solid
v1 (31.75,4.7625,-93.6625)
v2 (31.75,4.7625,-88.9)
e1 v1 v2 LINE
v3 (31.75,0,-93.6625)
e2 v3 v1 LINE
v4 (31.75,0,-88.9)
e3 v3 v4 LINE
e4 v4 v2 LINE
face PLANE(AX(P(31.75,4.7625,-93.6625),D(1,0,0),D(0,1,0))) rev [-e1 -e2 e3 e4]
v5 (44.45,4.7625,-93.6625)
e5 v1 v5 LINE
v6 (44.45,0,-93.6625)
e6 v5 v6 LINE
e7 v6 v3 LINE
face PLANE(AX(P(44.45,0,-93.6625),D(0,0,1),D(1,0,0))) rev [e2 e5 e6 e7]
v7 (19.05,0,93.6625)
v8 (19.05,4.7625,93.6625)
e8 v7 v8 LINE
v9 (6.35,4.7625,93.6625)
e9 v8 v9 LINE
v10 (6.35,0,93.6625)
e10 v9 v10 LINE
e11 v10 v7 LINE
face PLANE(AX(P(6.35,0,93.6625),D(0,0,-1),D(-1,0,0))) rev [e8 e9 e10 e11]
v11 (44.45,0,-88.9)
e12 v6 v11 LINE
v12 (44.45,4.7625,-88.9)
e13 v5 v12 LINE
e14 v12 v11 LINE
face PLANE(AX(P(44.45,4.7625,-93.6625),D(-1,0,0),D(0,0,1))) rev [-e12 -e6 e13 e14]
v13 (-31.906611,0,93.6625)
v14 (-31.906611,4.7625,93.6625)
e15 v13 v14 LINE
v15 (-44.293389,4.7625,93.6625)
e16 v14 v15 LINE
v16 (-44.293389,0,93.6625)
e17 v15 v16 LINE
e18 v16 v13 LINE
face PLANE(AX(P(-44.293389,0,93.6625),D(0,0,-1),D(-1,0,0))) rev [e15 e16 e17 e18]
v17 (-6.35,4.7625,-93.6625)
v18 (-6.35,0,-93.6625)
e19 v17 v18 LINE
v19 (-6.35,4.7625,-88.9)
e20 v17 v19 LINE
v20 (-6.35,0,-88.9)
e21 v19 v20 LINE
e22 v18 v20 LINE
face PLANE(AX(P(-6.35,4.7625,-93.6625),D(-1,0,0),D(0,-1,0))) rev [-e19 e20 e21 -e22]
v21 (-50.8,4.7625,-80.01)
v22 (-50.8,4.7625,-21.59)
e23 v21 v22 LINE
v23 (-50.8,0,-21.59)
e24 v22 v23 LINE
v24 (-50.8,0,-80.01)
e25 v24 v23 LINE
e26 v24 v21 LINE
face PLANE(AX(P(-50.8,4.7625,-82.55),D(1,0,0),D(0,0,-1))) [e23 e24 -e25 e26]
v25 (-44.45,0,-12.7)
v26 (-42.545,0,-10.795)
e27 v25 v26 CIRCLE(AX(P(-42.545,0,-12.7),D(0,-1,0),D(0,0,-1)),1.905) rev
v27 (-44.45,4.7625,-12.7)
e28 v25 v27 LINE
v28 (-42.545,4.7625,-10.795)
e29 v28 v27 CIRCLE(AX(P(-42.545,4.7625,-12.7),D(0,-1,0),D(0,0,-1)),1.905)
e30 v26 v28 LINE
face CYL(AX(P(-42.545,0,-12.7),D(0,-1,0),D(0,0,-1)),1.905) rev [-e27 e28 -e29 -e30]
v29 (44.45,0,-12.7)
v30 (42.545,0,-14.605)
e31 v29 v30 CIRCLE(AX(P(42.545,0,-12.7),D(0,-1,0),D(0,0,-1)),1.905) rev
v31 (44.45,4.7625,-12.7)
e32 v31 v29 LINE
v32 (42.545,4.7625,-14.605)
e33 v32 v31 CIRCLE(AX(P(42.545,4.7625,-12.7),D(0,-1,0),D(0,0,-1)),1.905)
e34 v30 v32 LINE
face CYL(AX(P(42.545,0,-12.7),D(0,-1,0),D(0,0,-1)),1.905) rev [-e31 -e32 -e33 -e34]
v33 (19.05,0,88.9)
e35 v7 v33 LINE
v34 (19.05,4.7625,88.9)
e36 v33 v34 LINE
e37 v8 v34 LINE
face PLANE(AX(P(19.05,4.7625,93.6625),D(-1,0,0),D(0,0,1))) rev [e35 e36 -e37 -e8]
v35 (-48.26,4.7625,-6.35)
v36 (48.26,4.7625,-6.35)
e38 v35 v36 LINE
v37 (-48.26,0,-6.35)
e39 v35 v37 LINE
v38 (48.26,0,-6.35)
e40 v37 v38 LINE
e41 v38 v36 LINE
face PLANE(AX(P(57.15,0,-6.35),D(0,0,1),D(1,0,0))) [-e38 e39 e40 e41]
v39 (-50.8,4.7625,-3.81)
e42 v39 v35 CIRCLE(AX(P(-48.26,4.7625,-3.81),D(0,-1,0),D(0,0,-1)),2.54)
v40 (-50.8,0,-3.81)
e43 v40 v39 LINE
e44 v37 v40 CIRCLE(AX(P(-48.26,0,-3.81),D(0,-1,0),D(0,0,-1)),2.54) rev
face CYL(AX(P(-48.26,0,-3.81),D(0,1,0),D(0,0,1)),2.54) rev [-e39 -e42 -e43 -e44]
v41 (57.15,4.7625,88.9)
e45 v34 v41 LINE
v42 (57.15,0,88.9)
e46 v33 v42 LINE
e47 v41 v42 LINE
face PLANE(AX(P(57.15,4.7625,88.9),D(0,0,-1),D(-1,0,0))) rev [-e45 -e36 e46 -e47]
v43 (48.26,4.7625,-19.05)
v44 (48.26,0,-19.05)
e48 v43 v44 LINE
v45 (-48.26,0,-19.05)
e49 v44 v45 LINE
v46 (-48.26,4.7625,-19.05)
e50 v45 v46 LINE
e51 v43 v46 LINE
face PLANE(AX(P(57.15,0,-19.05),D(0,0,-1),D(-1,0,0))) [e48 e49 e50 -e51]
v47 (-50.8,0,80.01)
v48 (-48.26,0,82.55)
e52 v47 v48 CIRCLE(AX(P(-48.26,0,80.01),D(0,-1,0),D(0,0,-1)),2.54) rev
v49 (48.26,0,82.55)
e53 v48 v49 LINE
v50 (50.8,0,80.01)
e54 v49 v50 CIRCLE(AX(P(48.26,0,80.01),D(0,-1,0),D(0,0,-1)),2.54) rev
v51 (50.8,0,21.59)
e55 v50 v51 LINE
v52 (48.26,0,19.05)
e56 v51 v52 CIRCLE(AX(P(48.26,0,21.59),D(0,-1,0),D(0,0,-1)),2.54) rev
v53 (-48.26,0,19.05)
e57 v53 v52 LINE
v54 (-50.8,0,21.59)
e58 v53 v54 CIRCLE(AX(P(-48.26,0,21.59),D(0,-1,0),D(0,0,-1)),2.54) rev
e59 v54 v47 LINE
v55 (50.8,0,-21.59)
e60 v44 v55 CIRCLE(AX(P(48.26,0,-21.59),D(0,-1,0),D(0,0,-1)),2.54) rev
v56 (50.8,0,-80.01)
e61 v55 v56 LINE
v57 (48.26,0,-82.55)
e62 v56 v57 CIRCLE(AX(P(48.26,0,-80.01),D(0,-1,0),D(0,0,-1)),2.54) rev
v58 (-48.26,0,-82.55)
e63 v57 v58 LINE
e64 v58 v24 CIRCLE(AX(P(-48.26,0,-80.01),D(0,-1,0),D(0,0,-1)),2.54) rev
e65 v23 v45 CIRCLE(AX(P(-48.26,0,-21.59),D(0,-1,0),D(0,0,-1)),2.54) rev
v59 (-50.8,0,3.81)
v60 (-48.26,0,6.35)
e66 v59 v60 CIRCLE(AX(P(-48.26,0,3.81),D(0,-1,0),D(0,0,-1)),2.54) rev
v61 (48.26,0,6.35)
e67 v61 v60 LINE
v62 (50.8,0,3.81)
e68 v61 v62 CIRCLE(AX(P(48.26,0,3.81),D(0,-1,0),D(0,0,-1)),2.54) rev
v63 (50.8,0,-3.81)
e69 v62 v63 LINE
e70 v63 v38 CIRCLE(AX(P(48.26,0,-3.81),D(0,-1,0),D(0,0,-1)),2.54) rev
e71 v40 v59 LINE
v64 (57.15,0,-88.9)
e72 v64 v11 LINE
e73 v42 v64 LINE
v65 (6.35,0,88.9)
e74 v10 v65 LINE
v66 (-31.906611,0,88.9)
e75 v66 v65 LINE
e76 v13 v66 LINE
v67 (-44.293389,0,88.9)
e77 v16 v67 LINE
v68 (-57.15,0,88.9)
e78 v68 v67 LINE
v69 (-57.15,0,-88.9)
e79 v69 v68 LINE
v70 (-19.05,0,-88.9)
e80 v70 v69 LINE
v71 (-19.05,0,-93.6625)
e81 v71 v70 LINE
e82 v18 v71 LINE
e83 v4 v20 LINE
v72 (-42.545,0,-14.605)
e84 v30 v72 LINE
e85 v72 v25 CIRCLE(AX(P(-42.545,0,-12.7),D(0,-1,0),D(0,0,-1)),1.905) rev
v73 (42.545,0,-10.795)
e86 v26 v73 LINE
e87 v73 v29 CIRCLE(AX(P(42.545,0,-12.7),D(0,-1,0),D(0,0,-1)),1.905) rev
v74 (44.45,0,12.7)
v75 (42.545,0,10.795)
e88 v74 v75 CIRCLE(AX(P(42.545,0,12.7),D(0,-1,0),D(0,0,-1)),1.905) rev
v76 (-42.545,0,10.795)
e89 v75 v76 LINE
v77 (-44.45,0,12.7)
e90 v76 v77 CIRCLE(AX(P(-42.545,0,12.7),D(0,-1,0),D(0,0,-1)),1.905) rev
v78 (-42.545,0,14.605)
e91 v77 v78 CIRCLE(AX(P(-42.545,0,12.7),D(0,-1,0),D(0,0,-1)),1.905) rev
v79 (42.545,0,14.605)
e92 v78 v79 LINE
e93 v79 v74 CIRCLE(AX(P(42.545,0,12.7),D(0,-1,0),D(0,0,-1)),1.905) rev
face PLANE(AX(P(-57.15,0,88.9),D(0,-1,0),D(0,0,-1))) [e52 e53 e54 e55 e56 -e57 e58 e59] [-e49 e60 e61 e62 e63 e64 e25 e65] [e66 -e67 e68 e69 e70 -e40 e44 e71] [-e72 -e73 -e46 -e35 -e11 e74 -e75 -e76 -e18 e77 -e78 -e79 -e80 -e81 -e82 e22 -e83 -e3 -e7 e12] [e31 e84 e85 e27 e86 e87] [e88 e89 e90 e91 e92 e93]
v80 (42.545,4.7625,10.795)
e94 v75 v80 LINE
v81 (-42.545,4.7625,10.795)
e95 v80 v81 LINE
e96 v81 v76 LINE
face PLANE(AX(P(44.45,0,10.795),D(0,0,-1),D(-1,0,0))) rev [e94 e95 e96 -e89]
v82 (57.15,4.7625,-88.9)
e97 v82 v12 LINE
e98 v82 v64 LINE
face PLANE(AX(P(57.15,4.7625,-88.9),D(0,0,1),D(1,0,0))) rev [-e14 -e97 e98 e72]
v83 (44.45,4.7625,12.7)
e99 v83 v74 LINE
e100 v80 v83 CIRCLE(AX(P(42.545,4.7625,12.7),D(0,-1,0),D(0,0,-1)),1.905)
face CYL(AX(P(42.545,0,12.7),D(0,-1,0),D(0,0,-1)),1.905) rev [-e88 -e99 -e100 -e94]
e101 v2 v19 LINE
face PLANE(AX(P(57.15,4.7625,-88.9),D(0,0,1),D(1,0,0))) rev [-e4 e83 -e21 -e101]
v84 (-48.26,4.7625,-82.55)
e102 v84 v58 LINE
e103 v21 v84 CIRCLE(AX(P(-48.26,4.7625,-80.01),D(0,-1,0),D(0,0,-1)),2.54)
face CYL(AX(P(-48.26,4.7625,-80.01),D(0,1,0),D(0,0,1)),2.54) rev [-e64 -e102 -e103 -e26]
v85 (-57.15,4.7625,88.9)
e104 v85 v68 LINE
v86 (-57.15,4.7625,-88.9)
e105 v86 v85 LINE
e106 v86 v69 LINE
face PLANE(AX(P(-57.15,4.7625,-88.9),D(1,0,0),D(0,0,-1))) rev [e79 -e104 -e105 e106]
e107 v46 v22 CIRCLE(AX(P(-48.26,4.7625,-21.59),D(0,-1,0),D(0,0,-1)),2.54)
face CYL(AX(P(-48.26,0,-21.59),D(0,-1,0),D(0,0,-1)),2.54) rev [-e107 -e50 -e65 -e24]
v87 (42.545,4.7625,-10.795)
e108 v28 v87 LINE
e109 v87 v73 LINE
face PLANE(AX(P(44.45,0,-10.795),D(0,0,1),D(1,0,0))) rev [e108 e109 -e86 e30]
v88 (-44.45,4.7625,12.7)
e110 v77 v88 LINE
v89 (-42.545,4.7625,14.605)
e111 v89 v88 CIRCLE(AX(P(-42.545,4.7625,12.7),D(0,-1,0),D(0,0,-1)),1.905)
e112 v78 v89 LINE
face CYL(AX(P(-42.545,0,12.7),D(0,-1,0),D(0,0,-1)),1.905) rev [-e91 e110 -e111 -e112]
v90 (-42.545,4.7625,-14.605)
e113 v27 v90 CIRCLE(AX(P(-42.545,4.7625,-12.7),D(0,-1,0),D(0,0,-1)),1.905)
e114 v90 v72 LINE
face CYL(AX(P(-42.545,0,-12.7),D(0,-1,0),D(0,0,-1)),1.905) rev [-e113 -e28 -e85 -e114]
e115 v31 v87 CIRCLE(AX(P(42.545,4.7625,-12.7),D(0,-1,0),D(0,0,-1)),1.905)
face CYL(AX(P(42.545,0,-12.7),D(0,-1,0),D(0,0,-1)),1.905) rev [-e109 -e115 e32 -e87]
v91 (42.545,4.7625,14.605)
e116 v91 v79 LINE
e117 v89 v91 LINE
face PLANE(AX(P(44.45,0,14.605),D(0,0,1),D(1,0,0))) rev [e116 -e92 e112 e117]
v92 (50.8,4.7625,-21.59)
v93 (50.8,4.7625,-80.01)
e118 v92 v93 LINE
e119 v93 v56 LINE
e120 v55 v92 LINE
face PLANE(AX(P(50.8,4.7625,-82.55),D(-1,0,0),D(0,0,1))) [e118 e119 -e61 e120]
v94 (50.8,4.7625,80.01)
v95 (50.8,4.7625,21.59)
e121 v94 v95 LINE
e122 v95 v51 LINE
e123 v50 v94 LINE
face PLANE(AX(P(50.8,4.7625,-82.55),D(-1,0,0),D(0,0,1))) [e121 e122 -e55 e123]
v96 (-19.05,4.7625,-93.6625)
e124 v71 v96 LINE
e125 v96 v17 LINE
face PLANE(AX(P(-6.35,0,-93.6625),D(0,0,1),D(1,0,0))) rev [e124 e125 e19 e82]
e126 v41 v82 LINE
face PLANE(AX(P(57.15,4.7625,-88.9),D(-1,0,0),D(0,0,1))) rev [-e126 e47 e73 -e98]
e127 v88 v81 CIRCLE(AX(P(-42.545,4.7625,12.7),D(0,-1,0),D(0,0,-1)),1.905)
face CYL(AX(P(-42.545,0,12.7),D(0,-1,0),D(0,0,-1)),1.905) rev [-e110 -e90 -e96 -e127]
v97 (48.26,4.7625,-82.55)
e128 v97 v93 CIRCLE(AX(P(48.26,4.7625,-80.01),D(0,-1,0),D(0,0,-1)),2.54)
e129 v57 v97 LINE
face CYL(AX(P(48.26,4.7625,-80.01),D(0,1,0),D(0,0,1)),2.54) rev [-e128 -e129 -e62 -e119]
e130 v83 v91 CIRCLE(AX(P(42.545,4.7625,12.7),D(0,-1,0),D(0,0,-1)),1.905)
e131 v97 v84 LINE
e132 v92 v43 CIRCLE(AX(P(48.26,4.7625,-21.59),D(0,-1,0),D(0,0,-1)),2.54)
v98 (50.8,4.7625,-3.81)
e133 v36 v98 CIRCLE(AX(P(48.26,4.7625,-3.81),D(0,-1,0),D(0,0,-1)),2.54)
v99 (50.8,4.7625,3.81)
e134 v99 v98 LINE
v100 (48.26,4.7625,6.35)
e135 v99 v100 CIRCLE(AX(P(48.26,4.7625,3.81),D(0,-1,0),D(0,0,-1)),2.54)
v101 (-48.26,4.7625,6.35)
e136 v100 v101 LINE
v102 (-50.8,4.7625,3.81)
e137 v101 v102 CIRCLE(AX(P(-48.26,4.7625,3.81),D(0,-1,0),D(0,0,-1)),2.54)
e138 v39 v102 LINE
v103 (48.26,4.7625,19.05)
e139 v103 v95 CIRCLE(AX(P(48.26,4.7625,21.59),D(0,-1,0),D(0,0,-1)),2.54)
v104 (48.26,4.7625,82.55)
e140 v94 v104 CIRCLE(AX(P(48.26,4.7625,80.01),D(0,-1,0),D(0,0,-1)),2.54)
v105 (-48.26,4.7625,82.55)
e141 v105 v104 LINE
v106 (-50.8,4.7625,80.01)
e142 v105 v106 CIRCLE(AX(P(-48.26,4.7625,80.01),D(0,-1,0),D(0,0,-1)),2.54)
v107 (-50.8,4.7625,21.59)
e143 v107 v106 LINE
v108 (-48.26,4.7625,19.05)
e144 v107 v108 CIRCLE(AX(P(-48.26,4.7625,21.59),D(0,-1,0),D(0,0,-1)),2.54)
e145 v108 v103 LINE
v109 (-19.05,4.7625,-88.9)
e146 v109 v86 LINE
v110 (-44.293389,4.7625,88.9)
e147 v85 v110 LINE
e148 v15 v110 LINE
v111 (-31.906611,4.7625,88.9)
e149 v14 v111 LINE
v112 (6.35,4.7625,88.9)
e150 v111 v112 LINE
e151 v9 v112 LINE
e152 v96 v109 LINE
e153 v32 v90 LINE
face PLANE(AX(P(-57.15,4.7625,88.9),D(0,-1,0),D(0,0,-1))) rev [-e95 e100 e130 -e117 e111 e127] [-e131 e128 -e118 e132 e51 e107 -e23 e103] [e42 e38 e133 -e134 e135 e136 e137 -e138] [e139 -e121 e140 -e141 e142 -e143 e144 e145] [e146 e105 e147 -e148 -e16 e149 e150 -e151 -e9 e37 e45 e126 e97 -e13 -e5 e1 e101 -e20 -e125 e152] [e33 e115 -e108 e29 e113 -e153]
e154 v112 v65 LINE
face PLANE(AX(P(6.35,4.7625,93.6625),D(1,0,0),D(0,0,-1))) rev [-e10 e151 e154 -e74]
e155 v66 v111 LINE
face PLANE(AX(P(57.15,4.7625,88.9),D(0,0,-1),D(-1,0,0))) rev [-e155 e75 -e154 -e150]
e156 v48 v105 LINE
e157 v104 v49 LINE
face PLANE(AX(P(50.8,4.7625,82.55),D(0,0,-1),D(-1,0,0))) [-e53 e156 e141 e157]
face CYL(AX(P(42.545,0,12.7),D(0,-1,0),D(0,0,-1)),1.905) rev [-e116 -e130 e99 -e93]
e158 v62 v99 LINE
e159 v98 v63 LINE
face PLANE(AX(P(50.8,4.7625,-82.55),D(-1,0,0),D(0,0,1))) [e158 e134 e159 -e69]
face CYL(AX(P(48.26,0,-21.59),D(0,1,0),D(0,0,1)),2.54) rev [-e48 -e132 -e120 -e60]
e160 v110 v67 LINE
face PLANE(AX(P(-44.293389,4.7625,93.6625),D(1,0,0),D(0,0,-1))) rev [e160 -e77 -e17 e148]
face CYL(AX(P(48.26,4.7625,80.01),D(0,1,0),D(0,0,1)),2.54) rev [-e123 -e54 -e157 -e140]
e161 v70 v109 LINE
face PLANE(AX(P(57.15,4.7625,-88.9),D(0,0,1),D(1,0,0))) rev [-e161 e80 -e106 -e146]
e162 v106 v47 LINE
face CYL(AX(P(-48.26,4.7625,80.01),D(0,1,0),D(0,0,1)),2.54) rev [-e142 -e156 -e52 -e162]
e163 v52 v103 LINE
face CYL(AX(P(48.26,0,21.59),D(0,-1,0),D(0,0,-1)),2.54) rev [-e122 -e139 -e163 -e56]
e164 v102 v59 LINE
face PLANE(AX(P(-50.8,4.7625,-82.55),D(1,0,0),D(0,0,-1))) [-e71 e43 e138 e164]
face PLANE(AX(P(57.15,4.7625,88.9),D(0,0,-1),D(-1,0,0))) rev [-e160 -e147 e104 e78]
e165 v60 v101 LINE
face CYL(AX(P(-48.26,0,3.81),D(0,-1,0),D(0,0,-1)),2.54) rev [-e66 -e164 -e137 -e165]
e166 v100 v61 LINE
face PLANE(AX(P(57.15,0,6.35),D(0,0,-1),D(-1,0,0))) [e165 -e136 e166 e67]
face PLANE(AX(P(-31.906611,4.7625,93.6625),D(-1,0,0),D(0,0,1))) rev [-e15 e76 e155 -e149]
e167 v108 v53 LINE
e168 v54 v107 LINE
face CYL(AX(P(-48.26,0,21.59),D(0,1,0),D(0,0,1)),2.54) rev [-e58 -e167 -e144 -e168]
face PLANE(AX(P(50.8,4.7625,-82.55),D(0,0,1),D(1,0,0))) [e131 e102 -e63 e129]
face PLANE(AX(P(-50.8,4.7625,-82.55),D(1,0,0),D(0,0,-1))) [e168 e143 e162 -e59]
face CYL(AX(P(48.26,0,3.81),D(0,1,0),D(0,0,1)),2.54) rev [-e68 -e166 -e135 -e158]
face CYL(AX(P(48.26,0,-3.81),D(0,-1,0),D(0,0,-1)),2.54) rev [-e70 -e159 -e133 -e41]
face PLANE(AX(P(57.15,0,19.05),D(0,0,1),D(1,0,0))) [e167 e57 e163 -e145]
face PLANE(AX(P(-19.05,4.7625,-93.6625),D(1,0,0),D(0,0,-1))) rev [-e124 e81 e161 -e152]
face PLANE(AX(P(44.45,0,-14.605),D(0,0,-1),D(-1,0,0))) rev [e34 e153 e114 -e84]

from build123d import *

# Parameters (mm, degrees)
SKETCH1_W           = 114.3
SKETCH1_H           = 177.8
SKETCH1_W_2         = 101.6
SKETCH1_H_2         = 165.1
BOSS_EXTRUDE1_DEPTH = 4.7625
SKETCH2_W           = 12.38677804
SKETCH2_H           = 4.7625
SKETCH2_W_2         = 12.7
BOSS_EXTRUDE2_DEPTH = 4.7625
SKETCH3_W           = 12.7
SKETCH3_H           = 4.7625
BOSS_EXTRUDE3_DEPTH = 4.7625
SKETCH7_W           = 114.3
SKETCH7_H           = 12.7
SKETCH7_W_2         = 88.9
SKETCH7_H_2         = 3.81
BOSS_EXTRUDE5_DEPTH = 4.7625
FILLET1_R           = 2.54
FILLET2_R           = 1.905


with BuildPart() as part:
    # Sketch1 → Boss-Extrude1 (new body)
    with BuildSketch(Plane(origin=(0, 0, 0), x_dir=(1, 0, 0), z_dir=(0, 1, 0))):
        Rectangle(SKETCH1_W, SKETCH1_H)
        Rectangle(SKETCH1_W_2, SKETCH1_H_2, mode=Mode.SUBTRACT)
    extrude(amount=BOSS_EXTRUDE1_DEPTH)

    # Sketch2 → Boss-Extrude2 (add)
    with BuildSketch(Plane.XY.offset(88.9)):
        with Locations((-38.1, 2.38125)):
            Rectangle(SKETCH2_W, SKETCH2_H)
        with Locations((12.7, 2.38125)):
            Rectangle(SKETCH2_W_2, SKETCH2_H)
    extrude(amount=BOSS_EXTRUDE2_DEPTH)

    # Sketch3 → Boss-Extrude3 (add)
    with BuildSketch(Plane(origin=(0, 0, -88.9), x_dir=(-1, 0, 0), z_dir=(0, 0, -1))):
        with Locations((-38.1, 2.38125)):
            Rectangle(SKETCH3_W, SKETCH3_H)
        with Locations((12.7, 2.38125)):
            Rectangle(SKETCH3_W, SKETCH3_H)
    extrude(amount=BOSS_EXTRUDE3_DEPTH)

    # Sketch7 → Boss-Extrude5 (add)
    # profile 1 of 2: a face of its own
    with BuildSketch(Plane(origin=(0, 4.7625, 0), x_dir=(1, 0, 0), z_dir=(0, 1, 0))):
        with Locations((0, 12.7)):
            Rectangle(SKETCH7_W, SKETCH7_H)
        with Locations((0, 12.7)):
            Rectangle(SKETCH7_W_2, SKETCH7_H_2, mode=Mode.SUBTRACT)
    # profile 2 of 2: a face of its own
    with BuildSketch(Plane(origin=(0, 4.7625, 0), x_dir=(1, 0, 0), z_dir=(0, 1, 0))):
        with Locations((0, -12.7)):
            Rectangle(SKETCH7_W, SKETCH7_H)
        with Locations((0, -12.7)):
            Rectangle(SKETCH7_W_2, SKETCH7_H_2, mode=Mode.SUBTRACT)
    extrude(amount=-BOSS_EXTRUDE5_DEPTH)

    # Fillet1
    fillet1_edges = [part.edges().sort_by_distance(p)[0] for p in [
        (50.8, 2.38125, -19.05),
        (50.8, 2.38125, -6.35),
        (-50.8, 2.38125, 19.05),
        (-50.8, 2.38125, 6.35),
        (50.8, 2.38125, 6.35),
        (50.8, 2.38125, 19.05),
        (50.8, 2.38125, 82.55),
        (50.8, 2.38125, -82.55),
        (-50.8, 2.38125, -82.55),
        (-50.8, 2.38125, 82.55),
        (-50.8, 2.38125, -6.35),
        (-50.8, 2.38125, -19.05),
    ]]
    fillet(fillet1_edges, radius=FILLET1_R)

    # Fillet2
    fillet2_edges = [part.edges().sort_by_distance(p)[0] for p in [
        (-44.45, 2.38125, -10.795),
        (-44.45, 2.38125, -14.605),
        (44.45, 2.38125, -10.795),
        (44.45, 2.38125, -14.605),
        (44.45, 2.38125, 14.605),
        (44.45, 2.38125, 10.795),
        (-44.45, 2.38125, 14.605),
        (-44.45, 2.38125, 10.795),
    ]]
    fillet(fillet2_edges, radius=FILLET2_R - 0.0001)  # a hair under: the kernel refuses the full size


solid = part.part
